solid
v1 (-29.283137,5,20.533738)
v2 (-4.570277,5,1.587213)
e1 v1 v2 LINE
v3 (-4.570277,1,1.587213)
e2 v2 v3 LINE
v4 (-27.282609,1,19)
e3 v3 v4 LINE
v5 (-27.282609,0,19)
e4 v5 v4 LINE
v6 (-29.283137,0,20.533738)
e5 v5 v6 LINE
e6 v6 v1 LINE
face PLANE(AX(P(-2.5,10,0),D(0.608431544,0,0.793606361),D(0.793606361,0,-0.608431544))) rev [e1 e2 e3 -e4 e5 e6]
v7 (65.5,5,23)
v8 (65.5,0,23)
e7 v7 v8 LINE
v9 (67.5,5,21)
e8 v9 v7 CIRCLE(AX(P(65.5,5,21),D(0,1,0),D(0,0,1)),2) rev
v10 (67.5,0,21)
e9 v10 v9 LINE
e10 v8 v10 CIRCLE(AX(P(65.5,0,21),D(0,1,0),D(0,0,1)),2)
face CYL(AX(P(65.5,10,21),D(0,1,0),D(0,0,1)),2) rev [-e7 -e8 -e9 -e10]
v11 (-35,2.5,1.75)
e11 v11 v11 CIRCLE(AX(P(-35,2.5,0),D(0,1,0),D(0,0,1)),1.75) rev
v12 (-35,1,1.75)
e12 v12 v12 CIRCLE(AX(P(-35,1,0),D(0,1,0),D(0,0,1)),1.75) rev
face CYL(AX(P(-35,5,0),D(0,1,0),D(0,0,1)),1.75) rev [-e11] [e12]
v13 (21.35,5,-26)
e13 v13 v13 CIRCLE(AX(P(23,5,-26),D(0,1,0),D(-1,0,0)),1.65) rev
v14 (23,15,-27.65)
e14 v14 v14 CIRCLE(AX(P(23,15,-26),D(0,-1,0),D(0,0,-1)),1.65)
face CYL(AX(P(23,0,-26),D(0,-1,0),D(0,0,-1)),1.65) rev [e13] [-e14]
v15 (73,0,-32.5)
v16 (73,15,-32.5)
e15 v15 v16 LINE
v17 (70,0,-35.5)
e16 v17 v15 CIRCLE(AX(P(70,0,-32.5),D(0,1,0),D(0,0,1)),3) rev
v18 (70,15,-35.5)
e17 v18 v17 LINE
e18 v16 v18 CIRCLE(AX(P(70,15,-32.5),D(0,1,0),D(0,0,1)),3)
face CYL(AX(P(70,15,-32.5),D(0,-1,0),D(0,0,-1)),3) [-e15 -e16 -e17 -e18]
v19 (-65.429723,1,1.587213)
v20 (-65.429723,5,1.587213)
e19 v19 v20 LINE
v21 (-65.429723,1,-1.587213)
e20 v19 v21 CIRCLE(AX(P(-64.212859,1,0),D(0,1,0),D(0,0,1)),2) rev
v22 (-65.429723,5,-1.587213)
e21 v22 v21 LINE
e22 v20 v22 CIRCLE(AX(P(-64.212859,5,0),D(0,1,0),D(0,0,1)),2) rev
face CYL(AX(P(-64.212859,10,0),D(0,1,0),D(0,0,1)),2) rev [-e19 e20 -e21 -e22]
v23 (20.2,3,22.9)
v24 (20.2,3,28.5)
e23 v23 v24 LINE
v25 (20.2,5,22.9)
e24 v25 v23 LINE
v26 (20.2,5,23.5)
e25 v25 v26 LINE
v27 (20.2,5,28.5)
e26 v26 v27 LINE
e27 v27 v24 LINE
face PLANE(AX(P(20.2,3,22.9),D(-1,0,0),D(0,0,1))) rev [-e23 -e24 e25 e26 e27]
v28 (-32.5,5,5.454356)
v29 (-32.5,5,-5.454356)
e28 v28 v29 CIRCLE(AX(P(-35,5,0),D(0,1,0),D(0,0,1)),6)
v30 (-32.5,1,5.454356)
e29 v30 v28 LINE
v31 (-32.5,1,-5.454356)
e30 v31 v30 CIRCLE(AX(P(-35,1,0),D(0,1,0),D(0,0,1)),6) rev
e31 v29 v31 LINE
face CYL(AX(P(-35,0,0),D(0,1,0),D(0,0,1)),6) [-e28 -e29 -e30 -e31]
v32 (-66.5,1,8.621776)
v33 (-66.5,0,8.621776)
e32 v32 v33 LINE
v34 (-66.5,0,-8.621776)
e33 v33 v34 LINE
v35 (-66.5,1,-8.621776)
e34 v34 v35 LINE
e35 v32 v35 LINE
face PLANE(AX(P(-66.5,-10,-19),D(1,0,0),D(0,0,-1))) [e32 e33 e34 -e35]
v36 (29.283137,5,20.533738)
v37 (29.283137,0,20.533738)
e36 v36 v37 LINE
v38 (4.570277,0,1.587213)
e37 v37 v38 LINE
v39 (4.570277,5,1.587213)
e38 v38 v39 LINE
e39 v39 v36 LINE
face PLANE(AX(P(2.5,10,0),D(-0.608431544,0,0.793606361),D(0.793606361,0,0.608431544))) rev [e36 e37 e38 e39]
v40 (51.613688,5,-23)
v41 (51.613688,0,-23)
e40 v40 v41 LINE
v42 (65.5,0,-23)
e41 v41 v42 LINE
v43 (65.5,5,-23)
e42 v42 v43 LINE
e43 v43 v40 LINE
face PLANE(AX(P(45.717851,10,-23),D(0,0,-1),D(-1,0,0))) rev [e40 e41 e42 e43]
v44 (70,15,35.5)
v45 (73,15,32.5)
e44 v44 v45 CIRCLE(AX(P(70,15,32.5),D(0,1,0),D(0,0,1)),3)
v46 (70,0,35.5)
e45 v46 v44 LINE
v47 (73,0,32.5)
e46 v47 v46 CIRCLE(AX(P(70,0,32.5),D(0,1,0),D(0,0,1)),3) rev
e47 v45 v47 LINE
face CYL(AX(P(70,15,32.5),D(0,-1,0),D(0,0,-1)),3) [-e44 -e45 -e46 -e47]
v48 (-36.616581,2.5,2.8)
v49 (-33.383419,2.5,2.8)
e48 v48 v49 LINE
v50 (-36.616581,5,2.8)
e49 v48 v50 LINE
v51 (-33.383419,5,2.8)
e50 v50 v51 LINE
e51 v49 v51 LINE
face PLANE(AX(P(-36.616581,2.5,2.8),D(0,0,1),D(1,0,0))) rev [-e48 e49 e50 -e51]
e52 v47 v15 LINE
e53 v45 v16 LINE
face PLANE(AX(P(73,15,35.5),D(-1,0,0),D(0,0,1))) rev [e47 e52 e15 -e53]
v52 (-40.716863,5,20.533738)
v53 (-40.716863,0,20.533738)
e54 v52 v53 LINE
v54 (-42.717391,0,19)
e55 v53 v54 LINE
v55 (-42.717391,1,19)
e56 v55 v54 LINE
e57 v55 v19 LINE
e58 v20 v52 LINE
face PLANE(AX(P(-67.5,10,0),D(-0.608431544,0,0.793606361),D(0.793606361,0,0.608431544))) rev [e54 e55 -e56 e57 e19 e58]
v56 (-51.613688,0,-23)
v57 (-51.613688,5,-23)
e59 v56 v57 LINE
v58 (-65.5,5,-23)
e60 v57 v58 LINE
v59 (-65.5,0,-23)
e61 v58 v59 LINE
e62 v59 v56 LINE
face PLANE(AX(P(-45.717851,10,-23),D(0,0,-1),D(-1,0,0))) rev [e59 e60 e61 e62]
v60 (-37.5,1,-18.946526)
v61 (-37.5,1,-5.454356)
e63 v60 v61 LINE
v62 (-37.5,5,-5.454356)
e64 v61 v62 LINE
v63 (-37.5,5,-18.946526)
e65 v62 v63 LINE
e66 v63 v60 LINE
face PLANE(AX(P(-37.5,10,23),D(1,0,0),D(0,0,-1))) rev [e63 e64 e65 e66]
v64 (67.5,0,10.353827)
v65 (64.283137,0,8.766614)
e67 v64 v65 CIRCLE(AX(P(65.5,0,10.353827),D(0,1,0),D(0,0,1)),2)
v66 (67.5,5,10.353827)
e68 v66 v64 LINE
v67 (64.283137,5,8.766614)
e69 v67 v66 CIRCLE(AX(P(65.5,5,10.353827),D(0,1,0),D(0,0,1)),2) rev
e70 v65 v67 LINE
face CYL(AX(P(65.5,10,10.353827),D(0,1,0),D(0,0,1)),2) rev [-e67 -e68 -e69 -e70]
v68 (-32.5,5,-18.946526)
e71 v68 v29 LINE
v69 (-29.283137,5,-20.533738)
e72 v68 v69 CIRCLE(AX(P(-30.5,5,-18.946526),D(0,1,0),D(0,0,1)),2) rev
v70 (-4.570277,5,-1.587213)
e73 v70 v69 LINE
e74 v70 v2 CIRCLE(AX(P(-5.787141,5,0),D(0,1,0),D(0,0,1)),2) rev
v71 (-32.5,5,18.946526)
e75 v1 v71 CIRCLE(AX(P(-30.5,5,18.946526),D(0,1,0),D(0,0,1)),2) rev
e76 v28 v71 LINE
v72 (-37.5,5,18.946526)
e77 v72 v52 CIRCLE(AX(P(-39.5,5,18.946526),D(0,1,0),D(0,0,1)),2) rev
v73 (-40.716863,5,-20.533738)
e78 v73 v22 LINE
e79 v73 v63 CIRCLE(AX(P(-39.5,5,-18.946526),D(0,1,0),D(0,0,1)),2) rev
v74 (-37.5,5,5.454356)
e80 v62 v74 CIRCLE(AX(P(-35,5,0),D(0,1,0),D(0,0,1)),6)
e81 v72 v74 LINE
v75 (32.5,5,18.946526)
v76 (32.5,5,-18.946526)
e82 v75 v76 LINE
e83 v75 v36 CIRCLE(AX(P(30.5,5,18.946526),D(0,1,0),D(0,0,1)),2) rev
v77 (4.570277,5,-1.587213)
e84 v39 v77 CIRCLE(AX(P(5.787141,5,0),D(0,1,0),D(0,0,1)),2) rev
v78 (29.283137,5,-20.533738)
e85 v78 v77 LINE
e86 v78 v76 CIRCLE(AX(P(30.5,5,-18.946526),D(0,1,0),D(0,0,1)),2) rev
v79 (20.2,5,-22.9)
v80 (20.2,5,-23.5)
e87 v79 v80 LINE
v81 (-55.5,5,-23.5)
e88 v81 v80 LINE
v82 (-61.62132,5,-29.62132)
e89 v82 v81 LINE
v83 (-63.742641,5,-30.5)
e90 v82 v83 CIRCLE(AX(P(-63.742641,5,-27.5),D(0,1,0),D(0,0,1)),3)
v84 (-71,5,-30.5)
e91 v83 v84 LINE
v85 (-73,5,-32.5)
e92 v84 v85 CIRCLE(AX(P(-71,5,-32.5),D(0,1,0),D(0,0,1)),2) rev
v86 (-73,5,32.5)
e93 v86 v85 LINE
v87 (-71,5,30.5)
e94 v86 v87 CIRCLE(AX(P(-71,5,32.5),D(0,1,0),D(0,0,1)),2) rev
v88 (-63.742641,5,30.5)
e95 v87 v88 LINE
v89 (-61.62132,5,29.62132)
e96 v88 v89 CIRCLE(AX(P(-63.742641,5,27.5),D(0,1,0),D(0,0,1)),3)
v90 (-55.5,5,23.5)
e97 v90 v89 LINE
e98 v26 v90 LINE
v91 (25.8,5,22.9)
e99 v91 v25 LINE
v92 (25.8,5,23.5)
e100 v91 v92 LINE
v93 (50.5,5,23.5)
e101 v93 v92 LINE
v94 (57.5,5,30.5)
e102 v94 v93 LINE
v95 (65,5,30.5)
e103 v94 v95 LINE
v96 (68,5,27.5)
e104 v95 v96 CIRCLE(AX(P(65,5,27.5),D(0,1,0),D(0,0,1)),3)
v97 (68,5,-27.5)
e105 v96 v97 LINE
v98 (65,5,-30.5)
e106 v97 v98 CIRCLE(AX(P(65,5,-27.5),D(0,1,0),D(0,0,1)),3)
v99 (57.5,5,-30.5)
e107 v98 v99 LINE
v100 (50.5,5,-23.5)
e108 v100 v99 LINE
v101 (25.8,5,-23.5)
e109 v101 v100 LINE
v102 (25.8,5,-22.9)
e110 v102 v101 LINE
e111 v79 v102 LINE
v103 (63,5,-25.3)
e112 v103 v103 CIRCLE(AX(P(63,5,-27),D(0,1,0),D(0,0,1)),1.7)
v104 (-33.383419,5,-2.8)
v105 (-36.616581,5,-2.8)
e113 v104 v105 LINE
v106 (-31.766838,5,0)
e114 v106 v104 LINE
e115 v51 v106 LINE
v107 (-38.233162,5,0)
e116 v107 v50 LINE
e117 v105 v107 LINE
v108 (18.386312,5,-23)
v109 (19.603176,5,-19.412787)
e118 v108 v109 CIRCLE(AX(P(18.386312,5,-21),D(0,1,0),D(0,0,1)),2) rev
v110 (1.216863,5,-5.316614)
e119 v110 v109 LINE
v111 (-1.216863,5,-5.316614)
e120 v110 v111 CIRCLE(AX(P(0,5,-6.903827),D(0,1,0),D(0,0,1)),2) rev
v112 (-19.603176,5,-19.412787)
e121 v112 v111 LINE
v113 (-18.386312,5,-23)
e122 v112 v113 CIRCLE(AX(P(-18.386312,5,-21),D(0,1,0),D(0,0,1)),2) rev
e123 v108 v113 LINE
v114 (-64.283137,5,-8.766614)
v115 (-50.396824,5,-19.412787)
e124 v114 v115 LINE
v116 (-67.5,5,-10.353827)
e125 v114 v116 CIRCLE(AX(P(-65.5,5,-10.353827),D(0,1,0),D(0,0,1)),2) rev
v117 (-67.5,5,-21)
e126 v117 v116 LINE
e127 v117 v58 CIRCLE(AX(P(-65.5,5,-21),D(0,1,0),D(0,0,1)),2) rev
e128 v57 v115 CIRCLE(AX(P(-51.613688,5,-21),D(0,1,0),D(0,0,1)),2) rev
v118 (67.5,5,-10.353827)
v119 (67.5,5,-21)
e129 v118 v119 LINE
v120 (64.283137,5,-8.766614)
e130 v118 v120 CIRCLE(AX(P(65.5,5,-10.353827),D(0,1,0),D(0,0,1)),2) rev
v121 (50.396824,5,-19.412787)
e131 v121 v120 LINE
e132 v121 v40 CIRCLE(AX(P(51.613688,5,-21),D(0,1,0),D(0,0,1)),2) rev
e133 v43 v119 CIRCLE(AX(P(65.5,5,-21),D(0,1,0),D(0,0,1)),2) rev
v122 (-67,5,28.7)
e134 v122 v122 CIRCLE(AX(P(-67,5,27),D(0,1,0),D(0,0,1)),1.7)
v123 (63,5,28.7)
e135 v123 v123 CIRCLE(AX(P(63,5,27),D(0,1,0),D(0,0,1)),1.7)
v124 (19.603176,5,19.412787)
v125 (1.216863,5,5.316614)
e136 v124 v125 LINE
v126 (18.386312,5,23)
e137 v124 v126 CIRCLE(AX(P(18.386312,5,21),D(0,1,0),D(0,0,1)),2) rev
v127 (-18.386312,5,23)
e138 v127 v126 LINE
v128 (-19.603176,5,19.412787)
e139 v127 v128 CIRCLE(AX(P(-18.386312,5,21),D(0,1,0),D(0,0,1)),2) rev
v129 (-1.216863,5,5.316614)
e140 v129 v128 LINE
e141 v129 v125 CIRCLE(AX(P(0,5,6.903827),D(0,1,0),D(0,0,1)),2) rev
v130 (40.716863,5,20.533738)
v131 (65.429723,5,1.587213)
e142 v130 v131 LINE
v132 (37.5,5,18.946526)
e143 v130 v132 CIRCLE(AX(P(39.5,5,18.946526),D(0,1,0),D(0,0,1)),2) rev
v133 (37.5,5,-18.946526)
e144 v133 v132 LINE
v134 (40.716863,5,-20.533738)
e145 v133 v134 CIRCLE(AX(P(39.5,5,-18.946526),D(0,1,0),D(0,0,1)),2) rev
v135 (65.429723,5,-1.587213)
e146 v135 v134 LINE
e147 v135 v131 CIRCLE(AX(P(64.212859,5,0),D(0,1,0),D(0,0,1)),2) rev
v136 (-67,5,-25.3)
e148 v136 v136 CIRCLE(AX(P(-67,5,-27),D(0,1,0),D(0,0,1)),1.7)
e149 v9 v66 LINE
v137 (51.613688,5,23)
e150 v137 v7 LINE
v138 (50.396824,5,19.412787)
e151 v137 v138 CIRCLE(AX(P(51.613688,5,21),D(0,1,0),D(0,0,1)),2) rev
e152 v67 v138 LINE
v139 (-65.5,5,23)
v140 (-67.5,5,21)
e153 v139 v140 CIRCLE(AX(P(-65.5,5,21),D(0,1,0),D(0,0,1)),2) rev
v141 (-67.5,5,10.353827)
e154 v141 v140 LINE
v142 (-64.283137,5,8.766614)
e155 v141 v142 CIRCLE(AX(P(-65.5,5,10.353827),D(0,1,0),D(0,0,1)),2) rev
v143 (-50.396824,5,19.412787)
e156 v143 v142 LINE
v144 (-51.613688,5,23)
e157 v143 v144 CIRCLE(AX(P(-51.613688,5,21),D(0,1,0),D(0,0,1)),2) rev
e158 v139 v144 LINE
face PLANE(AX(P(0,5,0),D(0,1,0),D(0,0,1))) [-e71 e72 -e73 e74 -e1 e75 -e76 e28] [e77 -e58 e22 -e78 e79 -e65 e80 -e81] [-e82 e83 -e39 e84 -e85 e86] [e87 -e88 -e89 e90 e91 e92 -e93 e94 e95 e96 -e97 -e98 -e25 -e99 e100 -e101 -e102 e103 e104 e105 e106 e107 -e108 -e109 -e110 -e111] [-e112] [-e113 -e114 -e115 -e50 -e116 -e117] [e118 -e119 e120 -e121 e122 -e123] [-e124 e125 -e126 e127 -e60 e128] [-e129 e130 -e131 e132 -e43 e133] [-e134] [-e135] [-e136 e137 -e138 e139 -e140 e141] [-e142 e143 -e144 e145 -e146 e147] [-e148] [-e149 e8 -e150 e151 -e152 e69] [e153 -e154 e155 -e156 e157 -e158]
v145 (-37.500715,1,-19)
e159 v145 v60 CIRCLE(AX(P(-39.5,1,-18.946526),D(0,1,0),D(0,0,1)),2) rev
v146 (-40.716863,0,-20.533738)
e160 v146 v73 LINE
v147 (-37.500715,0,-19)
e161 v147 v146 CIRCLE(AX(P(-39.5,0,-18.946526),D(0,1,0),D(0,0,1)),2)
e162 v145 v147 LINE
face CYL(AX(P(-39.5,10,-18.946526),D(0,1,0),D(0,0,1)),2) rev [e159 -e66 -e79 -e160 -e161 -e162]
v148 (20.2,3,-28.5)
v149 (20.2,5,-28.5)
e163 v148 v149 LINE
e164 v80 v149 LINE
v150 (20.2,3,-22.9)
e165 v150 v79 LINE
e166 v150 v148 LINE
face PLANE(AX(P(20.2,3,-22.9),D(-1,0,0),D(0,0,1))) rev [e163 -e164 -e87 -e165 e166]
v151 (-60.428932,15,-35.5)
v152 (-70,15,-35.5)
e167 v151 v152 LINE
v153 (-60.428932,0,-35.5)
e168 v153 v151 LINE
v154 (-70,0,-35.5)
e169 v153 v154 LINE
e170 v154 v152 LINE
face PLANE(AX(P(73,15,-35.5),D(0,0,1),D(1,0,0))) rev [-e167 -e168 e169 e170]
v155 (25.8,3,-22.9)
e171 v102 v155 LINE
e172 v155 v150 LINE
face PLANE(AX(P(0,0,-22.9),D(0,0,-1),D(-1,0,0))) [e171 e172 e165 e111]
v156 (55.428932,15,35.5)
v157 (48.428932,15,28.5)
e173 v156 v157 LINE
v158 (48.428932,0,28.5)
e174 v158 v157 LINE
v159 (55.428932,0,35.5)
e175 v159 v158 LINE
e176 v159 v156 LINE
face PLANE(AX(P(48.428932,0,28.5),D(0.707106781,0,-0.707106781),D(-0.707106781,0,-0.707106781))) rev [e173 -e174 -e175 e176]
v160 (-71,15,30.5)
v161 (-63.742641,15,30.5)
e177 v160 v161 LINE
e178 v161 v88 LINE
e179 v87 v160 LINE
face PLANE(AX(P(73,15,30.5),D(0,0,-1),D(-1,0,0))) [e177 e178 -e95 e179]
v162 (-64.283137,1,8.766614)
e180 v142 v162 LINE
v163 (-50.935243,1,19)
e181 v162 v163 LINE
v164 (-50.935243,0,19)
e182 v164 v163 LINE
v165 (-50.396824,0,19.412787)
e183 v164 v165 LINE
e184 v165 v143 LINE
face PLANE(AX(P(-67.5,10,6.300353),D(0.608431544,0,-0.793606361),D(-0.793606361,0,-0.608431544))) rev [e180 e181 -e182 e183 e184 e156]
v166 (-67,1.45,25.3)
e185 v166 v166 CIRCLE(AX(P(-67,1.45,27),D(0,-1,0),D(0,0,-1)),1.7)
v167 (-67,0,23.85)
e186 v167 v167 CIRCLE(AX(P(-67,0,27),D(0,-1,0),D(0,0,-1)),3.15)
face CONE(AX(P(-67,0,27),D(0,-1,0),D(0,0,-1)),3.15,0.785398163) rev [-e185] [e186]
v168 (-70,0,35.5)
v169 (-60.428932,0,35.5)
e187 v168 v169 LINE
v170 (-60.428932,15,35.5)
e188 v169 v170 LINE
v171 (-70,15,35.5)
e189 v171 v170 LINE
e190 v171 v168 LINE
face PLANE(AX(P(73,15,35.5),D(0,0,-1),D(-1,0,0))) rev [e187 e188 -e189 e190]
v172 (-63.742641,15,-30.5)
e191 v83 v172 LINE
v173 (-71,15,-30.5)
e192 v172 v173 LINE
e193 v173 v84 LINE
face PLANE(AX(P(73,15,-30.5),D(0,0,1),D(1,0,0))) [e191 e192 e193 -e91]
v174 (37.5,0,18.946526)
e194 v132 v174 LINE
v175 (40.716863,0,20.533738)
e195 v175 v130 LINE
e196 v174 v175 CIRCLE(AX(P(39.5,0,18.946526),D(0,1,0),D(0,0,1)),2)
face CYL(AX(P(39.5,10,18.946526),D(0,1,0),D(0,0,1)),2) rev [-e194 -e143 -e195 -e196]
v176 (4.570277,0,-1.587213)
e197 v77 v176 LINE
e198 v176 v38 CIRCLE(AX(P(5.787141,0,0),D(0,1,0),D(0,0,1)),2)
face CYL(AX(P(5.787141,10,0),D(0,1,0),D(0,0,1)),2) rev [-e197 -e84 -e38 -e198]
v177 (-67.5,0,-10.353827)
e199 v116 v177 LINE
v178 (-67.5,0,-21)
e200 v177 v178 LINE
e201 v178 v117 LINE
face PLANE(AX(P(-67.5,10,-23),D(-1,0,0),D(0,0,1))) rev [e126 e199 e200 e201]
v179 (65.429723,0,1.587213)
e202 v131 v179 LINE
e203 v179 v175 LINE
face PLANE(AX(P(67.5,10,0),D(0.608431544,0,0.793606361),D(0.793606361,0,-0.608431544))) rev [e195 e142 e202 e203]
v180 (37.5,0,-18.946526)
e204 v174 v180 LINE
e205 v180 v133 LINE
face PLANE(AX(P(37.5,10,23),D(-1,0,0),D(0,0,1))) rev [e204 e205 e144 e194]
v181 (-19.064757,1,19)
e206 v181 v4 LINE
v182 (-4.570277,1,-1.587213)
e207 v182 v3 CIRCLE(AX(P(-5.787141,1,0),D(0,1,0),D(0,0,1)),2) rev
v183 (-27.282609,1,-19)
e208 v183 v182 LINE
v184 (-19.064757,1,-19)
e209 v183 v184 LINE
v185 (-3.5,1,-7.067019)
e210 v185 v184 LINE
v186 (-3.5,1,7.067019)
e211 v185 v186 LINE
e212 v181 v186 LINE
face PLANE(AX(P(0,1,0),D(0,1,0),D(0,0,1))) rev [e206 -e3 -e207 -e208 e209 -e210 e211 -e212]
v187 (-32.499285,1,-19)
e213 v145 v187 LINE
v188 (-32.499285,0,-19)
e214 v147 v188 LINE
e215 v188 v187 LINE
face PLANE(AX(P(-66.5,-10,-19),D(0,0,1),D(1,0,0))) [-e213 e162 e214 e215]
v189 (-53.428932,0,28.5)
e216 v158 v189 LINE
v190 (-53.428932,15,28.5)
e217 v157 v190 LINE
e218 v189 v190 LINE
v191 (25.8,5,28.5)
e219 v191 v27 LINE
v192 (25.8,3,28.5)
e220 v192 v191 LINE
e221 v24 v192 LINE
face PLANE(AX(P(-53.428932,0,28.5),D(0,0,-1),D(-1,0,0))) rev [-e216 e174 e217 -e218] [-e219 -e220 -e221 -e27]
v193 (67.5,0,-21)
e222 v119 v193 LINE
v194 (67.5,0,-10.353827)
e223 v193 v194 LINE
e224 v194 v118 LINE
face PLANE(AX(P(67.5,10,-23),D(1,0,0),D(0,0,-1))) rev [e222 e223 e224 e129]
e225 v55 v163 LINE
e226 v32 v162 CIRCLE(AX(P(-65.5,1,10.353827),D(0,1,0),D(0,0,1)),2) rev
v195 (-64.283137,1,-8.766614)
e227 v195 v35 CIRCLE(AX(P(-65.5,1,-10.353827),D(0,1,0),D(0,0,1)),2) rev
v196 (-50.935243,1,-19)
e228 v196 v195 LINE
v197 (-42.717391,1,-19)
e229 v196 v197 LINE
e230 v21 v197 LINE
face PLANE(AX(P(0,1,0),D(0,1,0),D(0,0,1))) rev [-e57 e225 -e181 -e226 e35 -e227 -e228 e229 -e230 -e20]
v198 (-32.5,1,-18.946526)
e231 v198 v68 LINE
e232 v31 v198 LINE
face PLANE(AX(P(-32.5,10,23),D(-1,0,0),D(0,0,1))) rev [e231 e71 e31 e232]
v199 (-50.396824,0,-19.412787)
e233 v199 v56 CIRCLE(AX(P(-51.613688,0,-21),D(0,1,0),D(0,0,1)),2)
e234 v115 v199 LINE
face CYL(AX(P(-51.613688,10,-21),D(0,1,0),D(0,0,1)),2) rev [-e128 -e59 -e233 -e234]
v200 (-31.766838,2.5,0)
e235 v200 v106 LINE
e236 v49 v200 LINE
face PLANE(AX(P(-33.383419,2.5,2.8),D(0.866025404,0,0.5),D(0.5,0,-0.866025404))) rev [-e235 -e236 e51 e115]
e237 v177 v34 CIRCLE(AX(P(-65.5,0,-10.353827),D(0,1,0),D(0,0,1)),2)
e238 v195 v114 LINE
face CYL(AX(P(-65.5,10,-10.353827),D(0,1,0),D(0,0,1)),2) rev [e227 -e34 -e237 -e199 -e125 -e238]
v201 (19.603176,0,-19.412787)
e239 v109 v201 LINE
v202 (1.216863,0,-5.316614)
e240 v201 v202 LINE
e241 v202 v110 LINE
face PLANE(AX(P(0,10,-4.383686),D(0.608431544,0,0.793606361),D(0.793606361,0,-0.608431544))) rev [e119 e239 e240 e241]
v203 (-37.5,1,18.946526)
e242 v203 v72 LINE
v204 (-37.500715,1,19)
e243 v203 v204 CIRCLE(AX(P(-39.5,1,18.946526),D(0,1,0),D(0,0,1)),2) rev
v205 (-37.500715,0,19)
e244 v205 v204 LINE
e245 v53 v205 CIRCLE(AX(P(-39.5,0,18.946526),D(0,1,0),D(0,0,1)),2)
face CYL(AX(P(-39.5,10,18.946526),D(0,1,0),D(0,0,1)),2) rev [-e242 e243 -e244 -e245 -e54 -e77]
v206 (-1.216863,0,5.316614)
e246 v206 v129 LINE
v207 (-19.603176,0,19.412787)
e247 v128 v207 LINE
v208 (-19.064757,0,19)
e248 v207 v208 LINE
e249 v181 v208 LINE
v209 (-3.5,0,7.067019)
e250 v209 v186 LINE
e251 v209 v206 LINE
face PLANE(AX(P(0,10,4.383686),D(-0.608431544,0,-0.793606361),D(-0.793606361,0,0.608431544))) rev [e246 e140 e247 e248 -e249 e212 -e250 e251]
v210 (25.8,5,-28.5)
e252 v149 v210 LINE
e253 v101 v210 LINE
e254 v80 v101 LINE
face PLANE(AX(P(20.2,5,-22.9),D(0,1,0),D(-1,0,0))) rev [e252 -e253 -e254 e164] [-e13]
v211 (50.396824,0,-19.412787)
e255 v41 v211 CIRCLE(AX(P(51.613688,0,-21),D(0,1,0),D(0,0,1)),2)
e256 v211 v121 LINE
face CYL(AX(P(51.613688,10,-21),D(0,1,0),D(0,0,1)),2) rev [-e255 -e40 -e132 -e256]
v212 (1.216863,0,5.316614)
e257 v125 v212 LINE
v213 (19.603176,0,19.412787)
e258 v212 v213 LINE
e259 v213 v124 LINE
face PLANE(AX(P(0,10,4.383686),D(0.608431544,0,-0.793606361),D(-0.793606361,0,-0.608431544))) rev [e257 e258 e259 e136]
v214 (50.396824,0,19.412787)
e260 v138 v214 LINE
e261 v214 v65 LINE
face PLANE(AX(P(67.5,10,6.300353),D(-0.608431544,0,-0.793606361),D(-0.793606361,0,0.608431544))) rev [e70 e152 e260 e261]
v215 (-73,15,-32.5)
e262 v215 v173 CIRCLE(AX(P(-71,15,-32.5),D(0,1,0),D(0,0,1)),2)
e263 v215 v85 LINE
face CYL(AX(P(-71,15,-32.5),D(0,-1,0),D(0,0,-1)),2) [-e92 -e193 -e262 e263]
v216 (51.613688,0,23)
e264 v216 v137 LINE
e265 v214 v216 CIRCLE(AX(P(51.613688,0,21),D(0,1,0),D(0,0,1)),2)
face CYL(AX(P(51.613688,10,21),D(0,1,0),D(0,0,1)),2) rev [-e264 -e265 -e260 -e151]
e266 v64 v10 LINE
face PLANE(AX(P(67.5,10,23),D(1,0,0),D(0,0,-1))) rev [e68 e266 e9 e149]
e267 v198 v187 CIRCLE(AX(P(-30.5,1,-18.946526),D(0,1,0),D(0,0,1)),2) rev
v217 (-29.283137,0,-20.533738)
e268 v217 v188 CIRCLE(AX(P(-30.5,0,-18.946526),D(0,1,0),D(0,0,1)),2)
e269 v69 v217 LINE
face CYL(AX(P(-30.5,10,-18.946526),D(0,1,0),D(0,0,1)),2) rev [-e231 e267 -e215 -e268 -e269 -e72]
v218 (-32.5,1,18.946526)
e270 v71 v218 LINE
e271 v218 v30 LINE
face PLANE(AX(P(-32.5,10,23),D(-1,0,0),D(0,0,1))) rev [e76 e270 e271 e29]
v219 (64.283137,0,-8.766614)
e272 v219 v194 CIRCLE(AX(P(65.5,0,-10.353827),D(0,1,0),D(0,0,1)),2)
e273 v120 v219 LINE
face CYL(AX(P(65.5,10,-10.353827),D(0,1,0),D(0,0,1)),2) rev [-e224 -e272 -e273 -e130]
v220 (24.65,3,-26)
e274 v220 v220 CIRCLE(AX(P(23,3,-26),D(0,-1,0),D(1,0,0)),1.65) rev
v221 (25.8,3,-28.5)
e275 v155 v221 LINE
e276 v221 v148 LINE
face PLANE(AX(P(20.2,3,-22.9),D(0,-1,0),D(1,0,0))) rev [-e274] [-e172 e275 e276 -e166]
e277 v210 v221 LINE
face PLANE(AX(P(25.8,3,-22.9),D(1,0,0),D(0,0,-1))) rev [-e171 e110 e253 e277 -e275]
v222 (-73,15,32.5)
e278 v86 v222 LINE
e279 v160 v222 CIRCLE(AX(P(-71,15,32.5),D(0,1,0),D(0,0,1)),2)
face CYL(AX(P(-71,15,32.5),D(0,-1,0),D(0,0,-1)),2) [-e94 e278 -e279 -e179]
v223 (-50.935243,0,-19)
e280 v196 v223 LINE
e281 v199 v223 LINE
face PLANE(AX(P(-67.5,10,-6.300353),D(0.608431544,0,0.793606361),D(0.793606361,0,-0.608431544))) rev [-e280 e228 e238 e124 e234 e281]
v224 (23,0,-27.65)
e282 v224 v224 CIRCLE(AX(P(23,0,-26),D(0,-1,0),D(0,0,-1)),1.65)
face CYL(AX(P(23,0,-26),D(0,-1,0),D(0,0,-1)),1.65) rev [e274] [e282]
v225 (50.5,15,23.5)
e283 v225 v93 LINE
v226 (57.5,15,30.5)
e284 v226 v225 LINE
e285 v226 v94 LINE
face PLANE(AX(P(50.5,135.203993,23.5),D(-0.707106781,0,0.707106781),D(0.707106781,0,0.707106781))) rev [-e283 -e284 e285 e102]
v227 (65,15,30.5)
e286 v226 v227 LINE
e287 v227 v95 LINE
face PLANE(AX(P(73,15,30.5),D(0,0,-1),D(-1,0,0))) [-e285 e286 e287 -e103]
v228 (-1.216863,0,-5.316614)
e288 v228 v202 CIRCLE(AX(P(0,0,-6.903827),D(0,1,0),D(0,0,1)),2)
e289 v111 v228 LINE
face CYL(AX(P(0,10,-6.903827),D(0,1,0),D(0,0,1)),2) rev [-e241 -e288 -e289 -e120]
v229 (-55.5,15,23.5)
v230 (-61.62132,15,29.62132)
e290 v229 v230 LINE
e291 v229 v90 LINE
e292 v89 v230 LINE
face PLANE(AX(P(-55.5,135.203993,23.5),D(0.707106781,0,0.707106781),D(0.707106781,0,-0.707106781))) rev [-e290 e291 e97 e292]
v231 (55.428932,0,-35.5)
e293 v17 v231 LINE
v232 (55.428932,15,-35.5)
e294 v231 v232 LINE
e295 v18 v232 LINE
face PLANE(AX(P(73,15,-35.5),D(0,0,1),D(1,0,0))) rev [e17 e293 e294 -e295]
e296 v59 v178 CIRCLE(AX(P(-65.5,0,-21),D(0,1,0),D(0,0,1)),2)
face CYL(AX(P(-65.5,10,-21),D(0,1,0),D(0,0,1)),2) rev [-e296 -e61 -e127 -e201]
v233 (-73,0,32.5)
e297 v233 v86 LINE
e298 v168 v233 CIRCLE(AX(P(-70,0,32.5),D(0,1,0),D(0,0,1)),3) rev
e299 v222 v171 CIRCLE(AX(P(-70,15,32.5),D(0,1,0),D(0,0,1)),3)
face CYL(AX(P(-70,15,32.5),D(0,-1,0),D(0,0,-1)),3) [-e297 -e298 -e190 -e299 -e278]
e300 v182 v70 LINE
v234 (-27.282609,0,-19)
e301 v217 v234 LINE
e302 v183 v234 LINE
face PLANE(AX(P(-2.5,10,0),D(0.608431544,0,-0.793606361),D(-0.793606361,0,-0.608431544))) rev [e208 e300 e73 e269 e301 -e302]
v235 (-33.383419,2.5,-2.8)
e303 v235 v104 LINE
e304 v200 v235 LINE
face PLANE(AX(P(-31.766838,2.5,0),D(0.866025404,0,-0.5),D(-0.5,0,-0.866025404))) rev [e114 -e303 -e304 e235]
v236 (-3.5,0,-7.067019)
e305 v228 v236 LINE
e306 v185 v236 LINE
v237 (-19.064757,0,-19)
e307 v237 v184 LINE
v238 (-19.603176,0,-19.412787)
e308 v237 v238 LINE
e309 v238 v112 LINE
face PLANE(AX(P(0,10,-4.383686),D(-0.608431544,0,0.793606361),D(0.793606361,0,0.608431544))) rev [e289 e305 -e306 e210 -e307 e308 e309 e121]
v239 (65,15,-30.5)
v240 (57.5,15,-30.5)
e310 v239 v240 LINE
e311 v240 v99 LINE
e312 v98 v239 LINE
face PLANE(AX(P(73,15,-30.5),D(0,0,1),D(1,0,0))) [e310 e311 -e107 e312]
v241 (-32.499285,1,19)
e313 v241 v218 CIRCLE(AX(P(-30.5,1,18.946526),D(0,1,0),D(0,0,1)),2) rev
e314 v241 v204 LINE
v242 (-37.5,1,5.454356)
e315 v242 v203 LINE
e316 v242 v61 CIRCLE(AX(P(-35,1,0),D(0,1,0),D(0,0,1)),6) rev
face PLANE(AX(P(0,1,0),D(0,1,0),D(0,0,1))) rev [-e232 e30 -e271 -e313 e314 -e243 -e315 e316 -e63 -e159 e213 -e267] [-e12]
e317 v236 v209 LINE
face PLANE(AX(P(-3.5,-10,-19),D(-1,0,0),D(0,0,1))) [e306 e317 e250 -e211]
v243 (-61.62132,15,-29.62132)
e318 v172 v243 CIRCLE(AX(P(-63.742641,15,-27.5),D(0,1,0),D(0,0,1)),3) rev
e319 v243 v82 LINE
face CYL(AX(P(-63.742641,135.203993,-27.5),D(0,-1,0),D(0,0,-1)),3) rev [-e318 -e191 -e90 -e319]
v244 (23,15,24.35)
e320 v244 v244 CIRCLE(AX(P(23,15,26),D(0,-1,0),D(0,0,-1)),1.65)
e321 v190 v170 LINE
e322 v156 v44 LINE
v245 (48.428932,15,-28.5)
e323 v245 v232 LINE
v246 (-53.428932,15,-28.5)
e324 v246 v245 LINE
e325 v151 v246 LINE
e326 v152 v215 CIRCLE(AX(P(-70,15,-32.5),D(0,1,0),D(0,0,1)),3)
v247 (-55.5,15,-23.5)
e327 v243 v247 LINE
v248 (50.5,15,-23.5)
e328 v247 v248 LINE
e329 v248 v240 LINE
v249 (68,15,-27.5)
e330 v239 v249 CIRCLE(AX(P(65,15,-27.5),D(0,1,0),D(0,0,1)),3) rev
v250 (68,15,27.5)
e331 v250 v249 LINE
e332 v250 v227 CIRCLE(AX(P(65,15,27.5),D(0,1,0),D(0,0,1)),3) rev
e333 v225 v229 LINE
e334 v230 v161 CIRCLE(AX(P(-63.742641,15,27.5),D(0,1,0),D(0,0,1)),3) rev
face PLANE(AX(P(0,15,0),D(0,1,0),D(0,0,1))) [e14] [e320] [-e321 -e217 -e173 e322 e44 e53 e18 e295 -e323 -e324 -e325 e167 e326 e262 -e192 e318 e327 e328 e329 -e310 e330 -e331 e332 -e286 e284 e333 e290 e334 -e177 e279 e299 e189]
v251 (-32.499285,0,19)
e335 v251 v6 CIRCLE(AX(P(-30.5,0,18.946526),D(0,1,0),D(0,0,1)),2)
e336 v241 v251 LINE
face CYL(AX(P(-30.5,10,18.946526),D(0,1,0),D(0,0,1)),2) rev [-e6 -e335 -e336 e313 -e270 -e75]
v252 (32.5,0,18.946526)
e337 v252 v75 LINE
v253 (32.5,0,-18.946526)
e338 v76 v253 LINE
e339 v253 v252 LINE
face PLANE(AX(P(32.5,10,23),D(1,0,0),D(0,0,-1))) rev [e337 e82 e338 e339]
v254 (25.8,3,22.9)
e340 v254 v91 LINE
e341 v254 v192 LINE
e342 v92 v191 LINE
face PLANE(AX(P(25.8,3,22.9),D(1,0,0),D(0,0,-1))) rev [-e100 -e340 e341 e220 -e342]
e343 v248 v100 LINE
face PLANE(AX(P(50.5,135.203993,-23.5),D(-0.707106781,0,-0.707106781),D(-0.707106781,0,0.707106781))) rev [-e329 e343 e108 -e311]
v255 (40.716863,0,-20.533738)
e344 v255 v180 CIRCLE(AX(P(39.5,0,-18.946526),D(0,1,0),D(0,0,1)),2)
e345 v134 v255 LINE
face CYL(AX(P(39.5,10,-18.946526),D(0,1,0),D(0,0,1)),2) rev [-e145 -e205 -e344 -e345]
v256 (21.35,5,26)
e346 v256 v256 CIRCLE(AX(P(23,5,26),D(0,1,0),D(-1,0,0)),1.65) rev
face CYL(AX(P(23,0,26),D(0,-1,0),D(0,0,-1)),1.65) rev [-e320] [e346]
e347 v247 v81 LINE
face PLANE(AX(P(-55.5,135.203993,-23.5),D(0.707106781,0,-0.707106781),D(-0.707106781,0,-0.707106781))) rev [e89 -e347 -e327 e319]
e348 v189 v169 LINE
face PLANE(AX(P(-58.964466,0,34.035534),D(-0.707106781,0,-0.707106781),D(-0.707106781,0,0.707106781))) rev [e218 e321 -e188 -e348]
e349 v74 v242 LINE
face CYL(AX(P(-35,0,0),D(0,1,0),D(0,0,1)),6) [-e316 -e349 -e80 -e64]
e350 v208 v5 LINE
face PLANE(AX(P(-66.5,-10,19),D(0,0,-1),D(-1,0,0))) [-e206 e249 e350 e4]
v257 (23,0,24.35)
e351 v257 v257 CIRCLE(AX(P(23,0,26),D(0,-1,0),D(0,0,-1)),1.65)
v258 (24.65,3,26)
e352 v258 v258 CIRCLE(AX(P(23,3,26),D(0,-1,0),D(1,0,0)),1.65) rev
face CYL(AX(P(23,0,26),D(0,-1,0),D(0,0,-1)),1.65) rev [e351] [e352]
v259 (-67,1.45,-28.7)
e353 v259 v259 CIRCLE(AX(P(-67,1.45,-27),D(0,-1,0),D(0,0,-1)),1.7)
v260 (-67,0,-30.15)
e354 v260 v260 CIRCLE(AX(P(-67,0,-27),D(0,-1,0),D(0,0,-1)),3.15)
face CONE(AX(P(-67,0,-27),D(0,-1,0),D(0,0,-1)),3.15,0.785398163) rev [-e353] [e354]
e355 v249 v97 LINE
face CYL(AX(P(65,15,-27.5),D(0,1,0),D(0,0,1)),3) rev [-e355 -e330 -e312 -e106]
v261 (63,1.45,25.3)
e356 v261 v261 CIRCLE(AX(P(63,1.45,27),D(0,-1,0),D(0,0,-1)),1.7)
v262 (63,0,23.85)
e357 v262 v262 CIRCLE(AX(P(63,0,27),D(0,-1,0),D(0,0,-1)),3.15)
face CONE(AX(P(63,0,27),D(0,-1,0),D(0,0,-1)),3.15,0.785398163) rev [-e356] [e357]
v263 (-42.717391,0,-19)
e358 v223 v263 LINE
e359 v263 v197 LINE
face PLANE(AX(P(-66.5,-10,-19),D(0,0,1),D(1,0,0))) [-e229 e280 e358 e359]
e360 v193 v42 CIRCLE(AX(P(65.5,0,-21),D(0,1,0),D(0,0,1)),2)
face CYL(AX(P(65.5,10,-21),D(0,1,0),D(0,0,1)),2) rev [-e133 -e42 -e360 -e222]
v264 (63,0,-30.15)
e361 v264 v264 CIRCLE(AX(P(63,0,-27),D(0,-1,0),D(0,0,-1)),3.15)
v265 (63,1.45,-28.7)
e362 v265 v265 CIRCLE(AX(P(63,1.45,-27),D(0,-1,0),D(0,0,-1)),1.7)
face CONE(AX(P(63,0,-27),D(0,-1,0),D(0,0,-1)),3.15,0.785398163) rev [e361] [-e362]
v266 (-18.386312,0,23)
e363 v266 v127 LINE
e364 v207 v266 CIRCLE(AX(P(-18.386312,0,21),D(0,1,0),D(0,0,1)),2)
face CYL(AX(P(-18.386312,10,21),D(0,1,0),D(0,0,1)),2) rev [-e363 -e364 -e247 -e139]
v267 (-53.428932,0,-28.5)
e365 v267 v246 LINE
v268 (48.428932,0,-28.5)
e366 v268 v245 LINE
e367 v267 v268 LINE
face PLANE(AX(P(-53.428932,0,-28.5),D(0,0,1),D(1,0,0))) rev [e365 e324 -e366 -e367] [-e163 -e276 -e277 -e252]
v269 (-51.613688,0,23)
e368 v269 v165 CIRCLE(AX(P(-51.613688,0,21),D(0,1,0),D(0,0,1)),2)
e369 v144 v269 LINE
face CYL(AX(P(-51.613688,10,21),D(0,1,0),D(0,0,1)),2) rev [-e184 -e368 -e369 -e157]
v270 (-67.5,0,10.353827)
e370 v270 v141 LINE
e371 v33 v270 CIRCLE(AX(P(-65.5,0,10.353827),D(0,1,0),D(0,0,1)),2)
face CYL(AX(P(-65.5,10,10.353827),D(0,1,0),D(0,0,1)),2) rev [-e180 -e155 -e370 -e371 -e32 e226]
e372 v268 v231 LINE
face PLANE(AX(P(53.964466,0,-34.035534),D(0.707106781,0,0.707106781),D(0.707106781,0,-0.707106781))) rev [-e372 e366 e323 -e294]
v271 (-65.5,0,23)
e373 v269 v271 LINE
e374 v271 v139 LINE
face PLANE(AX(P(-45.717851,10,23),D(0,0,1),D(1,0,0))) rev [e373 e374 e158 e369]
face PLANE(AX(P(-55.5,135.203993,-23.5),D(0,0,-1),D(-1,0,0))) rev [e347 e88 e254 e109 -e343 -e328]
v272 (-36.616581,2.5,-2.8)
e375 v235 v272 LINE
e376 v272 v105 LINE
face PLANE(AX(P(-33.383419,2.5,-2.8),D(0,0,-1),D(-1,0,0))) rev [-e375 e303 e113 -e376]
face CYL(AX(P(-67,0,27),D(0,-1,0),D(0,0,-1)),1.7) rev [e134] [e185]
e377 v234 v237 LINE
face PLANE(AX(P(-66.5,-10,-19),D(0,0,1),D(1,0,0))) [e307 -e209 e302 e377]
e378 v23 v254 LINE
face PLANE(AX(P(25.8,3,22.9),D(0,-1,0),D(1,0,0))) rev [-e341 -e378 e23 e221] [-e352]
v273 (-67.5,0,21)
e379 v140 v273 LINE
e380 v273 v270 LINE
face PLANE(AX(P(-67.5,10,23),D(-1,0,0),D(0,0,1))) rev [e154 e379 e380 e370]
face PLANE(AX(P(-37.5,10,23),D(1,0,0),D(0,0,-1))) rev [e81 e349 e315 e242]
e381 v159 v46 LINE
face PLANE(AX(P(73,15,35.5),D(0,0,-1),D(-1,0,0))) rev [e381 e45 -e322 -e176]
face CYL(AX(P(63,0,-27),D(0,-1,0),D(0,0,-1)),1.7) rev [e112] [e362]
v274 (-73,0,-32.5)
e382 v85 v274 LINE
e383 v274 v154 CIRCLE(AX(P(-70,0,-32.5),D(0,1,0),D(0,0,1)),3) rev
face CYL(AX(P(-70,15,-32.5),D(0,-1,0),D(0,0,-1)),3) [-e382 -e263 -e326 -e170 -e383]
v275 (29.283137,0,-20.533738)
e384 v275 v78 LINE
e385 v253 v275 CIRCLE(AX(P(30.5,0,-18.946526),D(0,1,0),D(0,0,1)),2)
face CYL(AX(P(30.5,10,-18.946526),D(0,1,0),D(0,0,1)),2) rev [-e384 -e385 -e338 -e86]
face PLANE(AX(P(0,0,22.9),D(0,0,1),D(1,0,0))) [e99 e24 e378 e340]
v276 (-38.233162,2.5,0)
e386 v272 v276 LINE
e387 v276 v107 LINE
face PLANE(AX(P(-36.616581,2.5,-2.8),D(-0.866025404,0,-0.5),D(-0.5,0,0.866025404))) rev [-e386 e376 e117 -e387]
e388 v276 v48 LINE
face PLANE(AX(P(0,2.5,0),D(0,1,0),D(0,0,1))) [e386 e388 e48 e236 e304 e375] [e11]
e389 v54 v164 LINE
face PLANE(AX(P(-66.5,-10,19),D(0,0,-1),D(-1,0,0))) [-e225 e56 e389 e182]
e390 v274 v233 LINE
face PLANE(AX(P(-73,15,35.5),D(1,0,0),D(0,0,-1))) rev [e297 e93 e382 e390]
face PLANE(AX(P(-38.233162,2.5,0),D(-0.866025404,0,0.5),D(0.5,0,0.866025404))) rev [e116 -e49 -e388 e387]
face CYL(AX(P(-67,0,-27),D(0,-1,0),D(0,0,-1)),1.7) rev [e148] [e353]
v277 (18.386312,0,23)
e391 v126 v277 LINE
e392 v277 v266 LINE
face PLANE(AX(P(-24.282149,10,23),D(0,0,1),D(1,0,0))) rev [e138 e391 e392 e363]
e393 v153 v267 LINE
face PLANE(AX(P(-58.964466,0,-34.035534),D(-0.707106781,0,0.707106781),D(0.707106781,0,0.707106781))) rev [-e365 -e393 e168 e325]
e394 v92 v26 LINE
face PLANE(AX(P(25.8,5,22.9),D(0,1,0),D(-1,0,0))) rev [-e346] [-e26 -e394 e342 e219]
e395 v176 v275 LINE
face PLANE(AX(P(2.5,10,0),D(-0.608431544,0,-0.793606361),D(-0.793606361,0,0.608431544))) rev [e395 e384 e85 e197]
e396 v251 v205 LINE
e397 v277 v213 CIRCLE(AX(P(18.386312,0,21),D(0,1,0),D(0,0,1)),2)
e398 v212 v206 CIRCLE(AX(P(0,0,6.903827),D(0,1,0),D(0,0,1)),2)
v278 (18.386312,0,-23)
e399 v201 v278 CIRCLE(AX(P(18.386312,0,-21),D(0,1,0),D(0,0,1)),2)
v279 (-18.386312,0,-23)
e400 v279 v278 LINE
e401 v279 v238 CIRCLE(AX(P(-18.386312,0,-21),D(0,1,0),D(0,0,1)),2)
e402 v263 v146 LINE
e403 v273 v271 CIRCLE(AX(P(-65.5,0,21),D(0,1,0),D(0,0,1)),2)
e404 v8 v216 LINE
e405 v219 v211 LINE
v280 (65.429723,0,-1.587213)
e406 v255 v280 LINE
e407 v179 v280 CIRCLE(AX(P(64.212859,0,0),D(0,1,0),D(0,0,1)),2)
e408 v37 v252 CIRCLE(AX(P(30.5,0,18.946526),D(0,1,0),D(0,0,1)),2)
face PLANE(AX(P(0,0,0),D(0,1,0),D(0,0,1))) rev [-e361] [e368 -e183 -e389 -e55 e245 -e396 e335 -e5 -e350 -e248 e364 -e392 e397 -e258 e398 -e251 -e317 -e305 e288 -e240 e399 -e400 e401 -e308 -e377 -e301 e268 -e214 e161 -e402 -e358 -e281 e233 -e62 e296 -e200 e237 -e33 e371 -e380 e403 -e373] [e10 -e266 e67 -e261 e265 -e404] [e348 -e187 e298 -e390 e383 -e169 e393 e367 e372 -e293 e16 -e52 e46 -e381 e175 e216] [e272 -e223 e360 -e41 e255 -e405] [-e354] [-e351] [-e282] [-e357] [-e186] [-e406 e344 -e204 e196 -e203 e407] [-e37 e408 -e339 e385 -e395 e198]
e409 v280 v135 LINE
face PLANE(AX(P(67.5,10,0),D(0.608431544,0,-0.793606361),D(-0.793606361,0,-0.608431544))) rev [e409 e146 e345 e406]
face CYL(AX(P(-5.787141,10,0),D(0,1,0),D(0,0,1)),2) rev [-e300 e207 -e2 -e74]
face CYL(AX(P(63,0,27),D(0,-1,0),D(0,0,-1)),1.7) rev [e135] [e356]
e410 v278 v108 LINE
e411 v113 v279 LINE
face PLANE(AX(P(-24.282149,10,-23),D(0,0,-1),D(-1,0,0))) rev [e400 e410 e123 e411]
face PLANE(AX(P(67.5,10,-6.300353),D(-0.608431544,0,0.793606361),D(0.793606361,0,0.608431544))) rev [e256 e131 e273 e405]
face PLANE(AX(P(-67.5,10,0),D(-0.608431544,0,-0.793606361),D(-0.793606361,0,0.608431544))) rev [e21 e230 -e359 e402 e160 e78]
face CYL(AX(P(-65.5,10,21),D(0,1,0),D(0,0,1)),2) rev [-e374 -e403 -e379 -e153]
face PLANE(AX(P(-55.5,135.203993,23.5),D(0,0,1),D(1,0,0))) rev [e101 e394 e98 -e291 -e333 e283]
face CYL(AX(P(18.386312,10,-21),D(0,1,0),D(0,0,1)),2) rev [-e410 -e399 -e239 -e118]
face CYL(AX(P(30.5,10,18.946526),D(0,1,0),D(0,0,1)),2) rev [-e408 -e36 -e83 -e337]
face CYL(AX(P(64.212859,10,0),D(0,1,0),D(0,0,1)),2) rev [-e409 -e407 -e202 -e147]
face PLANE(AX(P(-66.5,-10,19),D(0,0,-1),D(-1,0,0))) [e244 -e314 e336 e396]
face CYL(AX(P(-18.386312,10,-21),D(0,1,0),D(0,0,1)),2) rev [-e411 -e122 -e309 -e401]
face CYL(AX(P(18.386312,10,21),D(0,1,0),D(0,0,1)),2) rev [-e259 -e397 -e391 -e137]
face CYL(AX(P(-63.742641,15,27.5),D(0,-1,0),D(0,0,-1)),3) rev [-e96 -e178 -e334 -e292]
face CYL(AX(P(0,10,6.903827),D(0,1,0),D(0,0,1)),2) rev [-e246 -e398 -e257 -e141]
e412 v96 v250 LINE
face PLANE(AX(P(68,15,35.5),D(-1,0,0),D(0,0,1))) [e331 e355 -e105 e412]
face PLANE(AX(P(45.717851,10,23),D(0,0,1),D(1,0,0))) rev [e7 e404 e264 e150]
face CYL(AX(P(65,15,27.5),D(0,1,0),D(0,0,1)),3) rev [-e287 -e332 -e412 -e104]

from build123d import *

# Parameters (mm, degrees)
SKETCH1_W                                       = 146
SKETCH1_H                                       = 71
BOSS_EXTRUDE1_DEPTH                             = 15
SHELL1_T                                        = -5
SKETCH2_W                                       = 5
SKETCH2_H                                       = 61
CUT_EXTRUDE1_DEPTH                              = 10
BOSS_EXTRUDE2_DEPTH                             = 10
CSK_FOR_M3_FLAT_HEAD_MACHINE_SCREW1_D           = 3.4
CSK_FOR_M3_FLAT_HEAD_MACHINE_SCREW1_DEPTH       = 10
CSK_FOR_M3_FLAT_HEAD_MACHINE_SCREW1_CSINK_D     = 6.3
CSK_FOR_M3_FLAT_HEAD_MACHINE_SCREW1_CSINK_ANGLE = 90
CSK_FOR_M3_FLAT_HEAD_MACHINE_SCREW1_TIP         = 1.021463052
FILLET1_R                                       = 3
CUT_EXTRUDE3_DEPTH                              = 10
FILLET2_R                                       = 2
SKETCH14_R                                      = 6
BOSS_EXTRUDE4_DEPTH                             = 5
F_3_5_3_5_DIAMETER_HOLE1_D                      = 3.5
CUT_EXTRUDE6_DEPTH                              = 2.5
CUT_EXTRUDE7_DEPTH                              = 10
CUT_EXTRUDE7_DEPTH_BACK                         = 1
SKETCH19_W                                      = 63
SKETCH19_H                                      = 38
CUT_EXTRUDE8_DEPTH                              = 83.54847061
FILLET4_R                                       = 2
FILLET5_R                                       = 3
F_3_3_3_3_DIAMETER_HOLE1_D                      = 3.3
SKETCH24_W                                      = 5.6
SKETCH24_H                                      = 2
CUT_EXTRUDE9_DEPTH                              = 5.6
SKETCH25_W                                      = 5.6
SKETCH25_H                                      = 2
CUT_EXTRUDE10_DEPTH                             = 5.6


with BuildPart() as part:
    # Sketch1 → Boss-Extrude1 (new body)
    with BuildSketch(Plane(origin=(0, 0, 0), x_dir=(1, 0, 0), z_dir=(0, 1, 0))):
        Rectangle(SKETCH1_W, SKETCH1_H)
    extrude(amount=BOSS_EXTRUDE1_DEPTH)

    # Shell1
    shell1_openings = [part.faces().sort_by_distance(p)[0] for p in [
        (0, 15, 0),
    ]]
    offset(amount=SHELL1_T, openings=shell1_openings, kind=Kind.INTERSECTION)

    # Sketch2 → Cut-Extrude1 (cut)
    with BuildSketch(Plane(origin=(0, 15, 0), x_dir=(1, 0, 0), z_dir=(0, 1, 0))):
        with Locations((-70.5, 0)):
            Rectangle(SKETCH2_W, SKETCH2_H)
    extrude(amount=-CUT_EXTRUDE1_DEPTH, mode=Mode.SUBTRACT)

    # Sketch3 → Boss-Extrude2 (add)
    with BuildSketch(Plane(origin=(0, 5, 0), x_dir=(1, 0, 0), z_dir=(0, 1, 0))):
        Polygon((-55.5, 23.5), (50.5, 23.5), (57.5, 30.5), (-62.5, 30.5), align=None)
        Polygon((-55.5, -23.5), (-62.5, -30.5), (57.5, -30.5), (50.5, -23.5), align=None)
    extrude(amount=BOSS_EXTRUDE2_DEPTH)

    # CSK for M3 Flat Head Machine Screw1
    with Locations(Plane(origin=(0, 0, 0), x_dir=(-1, 0, 0), z_dir=(0, -1, 0))):
        with Locations((-63, -27), (67, 27), (67, -27), (-63, 27)):
            CounterSinkHole(CSK_FOR_M3_FLAT_HEAD_MACHINE_SCREW1_D / 2, CSK_FOR_M3_FLAT_HEAD_MACHINE_SCREW1_CSINK_D / 2, depth=CSK_FOR_M3_FLAT_HEAD_MACHINE_SCREW1_DEPTH, counter_sink_angle=CSK_FOR_M3_FLAT_HEAD_MACHINE_SCREW1_CSINK_ANGLE)
            with Locations((0, 0, -(CSK_FOR_M3_FLAT_HEAD_MACHINE_SCREW1_DEPTH + CSK_FOR_M3_FLAT_HEAD_MACHINE_SCREW1_TIP / 2))):  # 118° drill point
                Cone(0, CSK_FOR_M3_FLAT_HEAD_MACHINE_SCREW1_D / 2, CSK_FOR_M3_FLAT_HEAD_MACHINE_SCREW1_TIP, mode=Mode.SUBTRACT)

    # Fillet1
    fillet1_edges = [part.edges().sort_by_distance(p)[0] for p in [
        (-73, 7.5, -35.5),
        (73, 7.5, -35.5),
        (73, 7.5, 35.5),
        (-73, 7.5, 35.5),
    ]]
    fillet(fillet1_edges, radius=FILLET1_R)

    # Sketch8 → Cut-Extrude3 (cut)
    with BuildSketch(Plane.XZ):
        Polygon((67.5, 0), (37.5, 23), (37.5, -23), align=None)
        Polygon((0, 4.383686057), (24.282148621, 23), (-24.282148621, 23), align=None)
        Polygon((2.5, 0), (32.5, -23), (32.5, 23), align=None)
        Polygon((-2.5, 0), (-32.5, 23), (-32.5, -23), align=None)
        Polygon((-67.5, 0), (-37.5, -23), (-37.5, 23), align=None)
        Polygon((-45.717851379, 23), (-67.5, 23), (-67.5, 6.300352724), align=None)
        Polygon((67.5, 6.300352724), (45.717851379, 23), (67.5, 23), align=None)
        Polygon((45.717851379, -23), (67.5, -23), (67.5, -6.300352724), align=None)
        Polygon((-67.5, -6.300352724), (-45.717851379, -23), (-67.5, -23), align=None)
        Polygon((-24.282148621, -23), (24.282148621, -23), (0, -4.383686057), align=None)
    extrude(amount=-CUT_EXTRUDE3_DEPTH, mode=Mode.SUBTRACT)

    # Fillet2
    fillet2_edges = [part.edges().sort_by_distance(p)[0] for p in [
        (-67.5, 2.5, 0),
        (-37.5, 2.5, 23),
        (-37.5, 2.5, -23),
        (0, 2.5, 4.383686057),
        (-24.282148621, 2.5, 23),
        (24.282148621, 2.5, 23),
        (45.717851379, 2.5, -23),
        (67.5, 2.5, -6.300352724),
        (67.5, 2.5, -23),
        (-67.5, 2.5, -23),
        (-67.5, 2.5, -6.300352724),
        (-45.717851379, 2.5, -23),
        (67.5, 2.5, 23),
        (67.5, 2.5, 6.300352724),
        (45.717851379, 2.5, 23),
        (-45.717851379, 2.5, 23),
        (-67.5, 2.5, 6.300352724),
        (-67.5, 2.5, 23),
        (-2.5, 2.5, 0),
        (-32.5, 2.5, -23),
        (-32.5, 2.5, 23),
        (2.5, 2.5, 0),
        (32.5, 2.5, 23),
        (32.5, 2.5, -23),
        (-24.282148621, 2.5, -23),
        (0, 2.5, -4.383686057),
        (24.282148621, 2.5, -23),
        (67.5, 2.5, 0),
        (37.5, 2.5, -23),
        (37.5, 2.5, 23),
    ]]
    fillet(fillet2_edges, radius=FILLET2_R)

    # Sketch14 → Boss-Extrude4 (add, through all)
    with BuildSketch(Plane(origin=(0, 5, 0), x_dir=(1, 0, 0), z_dir=(0, 1, 0))):
        with Locations((-35, 0)):
            Circle(SKETCH14_R)
    extrude(amount=-BOSS_EXTRUDE4_DEPTH)

    # Ø3.5 (3.5) Diameter Hole1 (through all)
    with Locations(Plane(origin=(0, 5, 0), x_dir=(1, 0, 0), z_dir=(0, 1, 0))):
        with Locations((-35, 0)):
            Hole(F_3_5_3_5_DIAMETER_HOLE1_D / 2)

    # Sketch17 → Cut-Extrude6 (cut)
    with BuildSketch(Plane(origin=(0, 5, 0), x_dir=(1, 0, 0), z_dir=(0, 1, 0))):
        Polygon((-31.766838493, 0), (-33.383419246, 2.8), (-36.616580754, 2.8), (-38.233161507, 0), (-36.616580754, -2.8), (-33.383419246, -2.8), align=None)
    extrude(amount=-CUT_EXTRUDE6_DEPTH, mode=Mode.SUBTRACT)

    # Sketch19 → Cut-Extrude7 (cut, two sides: drawn at the far end of the back side and taken through both)
    with BuildSketch(Plane.XZ.offset(-CUT_EXTRUDE7_DEPTH_BACK)):
        with Locations((-35, 0)):
            Rectangle(SKETCH19_W, SKETCH19_H)
    extrude(amount=CUT_EXTRUDE7_DEPTH + CUT_EXTRUDE7_DEPTH_BACK, mode=Mode.SUBTRACT)

    # Sketch20 → Cut-Extrude8 (cut, through all)
    with BuildSketch(Plane(origin=(0, 15, 0), x_dir=(1, 0, 0), z_dir=(0, 1, 0))):
        Polygon((-58.964466094, 34.035533906), (-60.428932188, 35.5), (55.428932188, 35.5), (53.964466094, 34.035533906), (48.428932188, 28.5), (-53.428932188, 28.5), align=None)
        Polygon((-58.964466094, -34.035533906), (-53.428932188, -28.5), (48.428932188, -28.5), (53.964466094, -34.035533906), (55.428932188, -35.5), (-60.428932188, -35.5), align=None)
    extrude(amount=-CUT_EXTRUDE8_DEPTH, mode=Mode.SUBTRACT)

    # Fillet4
    fillet4_edges = [part.edges().sort_by_distance(p)[0] for p in [
        (-73, 10, -30.5),
        (-73, 10, 30.5),
    ]]
    fillet(fillet4_edges, radius=FILLET4_R - 0.0001)  # a hair under: the kernel refuses the full size

    # Fillet5
    fillet5_edges = [part.edges().sort_by_distance(p)[0] for p in [
        (68, 10, 30.5),
        (68, 10, -30.5),
        (-62.5, 10, -30.5),
        (-62.5, 10, 30.5),
    ]]
    fillet(fillet5_edges, radius=FILLET5_R)

    # Ø3.3 (3.3) Diameter Hole1 (through all)
    with Locations(Plane(origin=(0, 0, 0), x_dir=(-1, 0, 0), z_dir=(0, -1, 0))):
        with Locations((-23, 26), (-23, -26)):
            Hole(F_3_3_3_3_DIAMETER_HOLE1_D / 2)

    # Sketch24 → Cut-Extrude9 (cut)
    with BuildSketch(Plane.XY.offset(28.5)):
        with Locations((23, 4)):
            Rectangle(SKETCH24_W, SKETCH24_H)
    extrude(amount=-CUT_EXTRUDE9_DEPTH, mode=Mode.SUBTRACT)

    # Sketch25 → Cut-Extrude10 (cut)
    with BuildSketch(Plane(origin=(0, 0, -28.5), x_dir=(-1, 0, 0), z_dir=(0, 0, -1))):
        with Locations((-23, 4)):
            Rectangle(SKETCH25_W, SKETCH25_H)
    extrude(amount=-CUT_EXTRUDE10_DEPTH, mode=Mode.SUBTRACT)


solid = part.part
